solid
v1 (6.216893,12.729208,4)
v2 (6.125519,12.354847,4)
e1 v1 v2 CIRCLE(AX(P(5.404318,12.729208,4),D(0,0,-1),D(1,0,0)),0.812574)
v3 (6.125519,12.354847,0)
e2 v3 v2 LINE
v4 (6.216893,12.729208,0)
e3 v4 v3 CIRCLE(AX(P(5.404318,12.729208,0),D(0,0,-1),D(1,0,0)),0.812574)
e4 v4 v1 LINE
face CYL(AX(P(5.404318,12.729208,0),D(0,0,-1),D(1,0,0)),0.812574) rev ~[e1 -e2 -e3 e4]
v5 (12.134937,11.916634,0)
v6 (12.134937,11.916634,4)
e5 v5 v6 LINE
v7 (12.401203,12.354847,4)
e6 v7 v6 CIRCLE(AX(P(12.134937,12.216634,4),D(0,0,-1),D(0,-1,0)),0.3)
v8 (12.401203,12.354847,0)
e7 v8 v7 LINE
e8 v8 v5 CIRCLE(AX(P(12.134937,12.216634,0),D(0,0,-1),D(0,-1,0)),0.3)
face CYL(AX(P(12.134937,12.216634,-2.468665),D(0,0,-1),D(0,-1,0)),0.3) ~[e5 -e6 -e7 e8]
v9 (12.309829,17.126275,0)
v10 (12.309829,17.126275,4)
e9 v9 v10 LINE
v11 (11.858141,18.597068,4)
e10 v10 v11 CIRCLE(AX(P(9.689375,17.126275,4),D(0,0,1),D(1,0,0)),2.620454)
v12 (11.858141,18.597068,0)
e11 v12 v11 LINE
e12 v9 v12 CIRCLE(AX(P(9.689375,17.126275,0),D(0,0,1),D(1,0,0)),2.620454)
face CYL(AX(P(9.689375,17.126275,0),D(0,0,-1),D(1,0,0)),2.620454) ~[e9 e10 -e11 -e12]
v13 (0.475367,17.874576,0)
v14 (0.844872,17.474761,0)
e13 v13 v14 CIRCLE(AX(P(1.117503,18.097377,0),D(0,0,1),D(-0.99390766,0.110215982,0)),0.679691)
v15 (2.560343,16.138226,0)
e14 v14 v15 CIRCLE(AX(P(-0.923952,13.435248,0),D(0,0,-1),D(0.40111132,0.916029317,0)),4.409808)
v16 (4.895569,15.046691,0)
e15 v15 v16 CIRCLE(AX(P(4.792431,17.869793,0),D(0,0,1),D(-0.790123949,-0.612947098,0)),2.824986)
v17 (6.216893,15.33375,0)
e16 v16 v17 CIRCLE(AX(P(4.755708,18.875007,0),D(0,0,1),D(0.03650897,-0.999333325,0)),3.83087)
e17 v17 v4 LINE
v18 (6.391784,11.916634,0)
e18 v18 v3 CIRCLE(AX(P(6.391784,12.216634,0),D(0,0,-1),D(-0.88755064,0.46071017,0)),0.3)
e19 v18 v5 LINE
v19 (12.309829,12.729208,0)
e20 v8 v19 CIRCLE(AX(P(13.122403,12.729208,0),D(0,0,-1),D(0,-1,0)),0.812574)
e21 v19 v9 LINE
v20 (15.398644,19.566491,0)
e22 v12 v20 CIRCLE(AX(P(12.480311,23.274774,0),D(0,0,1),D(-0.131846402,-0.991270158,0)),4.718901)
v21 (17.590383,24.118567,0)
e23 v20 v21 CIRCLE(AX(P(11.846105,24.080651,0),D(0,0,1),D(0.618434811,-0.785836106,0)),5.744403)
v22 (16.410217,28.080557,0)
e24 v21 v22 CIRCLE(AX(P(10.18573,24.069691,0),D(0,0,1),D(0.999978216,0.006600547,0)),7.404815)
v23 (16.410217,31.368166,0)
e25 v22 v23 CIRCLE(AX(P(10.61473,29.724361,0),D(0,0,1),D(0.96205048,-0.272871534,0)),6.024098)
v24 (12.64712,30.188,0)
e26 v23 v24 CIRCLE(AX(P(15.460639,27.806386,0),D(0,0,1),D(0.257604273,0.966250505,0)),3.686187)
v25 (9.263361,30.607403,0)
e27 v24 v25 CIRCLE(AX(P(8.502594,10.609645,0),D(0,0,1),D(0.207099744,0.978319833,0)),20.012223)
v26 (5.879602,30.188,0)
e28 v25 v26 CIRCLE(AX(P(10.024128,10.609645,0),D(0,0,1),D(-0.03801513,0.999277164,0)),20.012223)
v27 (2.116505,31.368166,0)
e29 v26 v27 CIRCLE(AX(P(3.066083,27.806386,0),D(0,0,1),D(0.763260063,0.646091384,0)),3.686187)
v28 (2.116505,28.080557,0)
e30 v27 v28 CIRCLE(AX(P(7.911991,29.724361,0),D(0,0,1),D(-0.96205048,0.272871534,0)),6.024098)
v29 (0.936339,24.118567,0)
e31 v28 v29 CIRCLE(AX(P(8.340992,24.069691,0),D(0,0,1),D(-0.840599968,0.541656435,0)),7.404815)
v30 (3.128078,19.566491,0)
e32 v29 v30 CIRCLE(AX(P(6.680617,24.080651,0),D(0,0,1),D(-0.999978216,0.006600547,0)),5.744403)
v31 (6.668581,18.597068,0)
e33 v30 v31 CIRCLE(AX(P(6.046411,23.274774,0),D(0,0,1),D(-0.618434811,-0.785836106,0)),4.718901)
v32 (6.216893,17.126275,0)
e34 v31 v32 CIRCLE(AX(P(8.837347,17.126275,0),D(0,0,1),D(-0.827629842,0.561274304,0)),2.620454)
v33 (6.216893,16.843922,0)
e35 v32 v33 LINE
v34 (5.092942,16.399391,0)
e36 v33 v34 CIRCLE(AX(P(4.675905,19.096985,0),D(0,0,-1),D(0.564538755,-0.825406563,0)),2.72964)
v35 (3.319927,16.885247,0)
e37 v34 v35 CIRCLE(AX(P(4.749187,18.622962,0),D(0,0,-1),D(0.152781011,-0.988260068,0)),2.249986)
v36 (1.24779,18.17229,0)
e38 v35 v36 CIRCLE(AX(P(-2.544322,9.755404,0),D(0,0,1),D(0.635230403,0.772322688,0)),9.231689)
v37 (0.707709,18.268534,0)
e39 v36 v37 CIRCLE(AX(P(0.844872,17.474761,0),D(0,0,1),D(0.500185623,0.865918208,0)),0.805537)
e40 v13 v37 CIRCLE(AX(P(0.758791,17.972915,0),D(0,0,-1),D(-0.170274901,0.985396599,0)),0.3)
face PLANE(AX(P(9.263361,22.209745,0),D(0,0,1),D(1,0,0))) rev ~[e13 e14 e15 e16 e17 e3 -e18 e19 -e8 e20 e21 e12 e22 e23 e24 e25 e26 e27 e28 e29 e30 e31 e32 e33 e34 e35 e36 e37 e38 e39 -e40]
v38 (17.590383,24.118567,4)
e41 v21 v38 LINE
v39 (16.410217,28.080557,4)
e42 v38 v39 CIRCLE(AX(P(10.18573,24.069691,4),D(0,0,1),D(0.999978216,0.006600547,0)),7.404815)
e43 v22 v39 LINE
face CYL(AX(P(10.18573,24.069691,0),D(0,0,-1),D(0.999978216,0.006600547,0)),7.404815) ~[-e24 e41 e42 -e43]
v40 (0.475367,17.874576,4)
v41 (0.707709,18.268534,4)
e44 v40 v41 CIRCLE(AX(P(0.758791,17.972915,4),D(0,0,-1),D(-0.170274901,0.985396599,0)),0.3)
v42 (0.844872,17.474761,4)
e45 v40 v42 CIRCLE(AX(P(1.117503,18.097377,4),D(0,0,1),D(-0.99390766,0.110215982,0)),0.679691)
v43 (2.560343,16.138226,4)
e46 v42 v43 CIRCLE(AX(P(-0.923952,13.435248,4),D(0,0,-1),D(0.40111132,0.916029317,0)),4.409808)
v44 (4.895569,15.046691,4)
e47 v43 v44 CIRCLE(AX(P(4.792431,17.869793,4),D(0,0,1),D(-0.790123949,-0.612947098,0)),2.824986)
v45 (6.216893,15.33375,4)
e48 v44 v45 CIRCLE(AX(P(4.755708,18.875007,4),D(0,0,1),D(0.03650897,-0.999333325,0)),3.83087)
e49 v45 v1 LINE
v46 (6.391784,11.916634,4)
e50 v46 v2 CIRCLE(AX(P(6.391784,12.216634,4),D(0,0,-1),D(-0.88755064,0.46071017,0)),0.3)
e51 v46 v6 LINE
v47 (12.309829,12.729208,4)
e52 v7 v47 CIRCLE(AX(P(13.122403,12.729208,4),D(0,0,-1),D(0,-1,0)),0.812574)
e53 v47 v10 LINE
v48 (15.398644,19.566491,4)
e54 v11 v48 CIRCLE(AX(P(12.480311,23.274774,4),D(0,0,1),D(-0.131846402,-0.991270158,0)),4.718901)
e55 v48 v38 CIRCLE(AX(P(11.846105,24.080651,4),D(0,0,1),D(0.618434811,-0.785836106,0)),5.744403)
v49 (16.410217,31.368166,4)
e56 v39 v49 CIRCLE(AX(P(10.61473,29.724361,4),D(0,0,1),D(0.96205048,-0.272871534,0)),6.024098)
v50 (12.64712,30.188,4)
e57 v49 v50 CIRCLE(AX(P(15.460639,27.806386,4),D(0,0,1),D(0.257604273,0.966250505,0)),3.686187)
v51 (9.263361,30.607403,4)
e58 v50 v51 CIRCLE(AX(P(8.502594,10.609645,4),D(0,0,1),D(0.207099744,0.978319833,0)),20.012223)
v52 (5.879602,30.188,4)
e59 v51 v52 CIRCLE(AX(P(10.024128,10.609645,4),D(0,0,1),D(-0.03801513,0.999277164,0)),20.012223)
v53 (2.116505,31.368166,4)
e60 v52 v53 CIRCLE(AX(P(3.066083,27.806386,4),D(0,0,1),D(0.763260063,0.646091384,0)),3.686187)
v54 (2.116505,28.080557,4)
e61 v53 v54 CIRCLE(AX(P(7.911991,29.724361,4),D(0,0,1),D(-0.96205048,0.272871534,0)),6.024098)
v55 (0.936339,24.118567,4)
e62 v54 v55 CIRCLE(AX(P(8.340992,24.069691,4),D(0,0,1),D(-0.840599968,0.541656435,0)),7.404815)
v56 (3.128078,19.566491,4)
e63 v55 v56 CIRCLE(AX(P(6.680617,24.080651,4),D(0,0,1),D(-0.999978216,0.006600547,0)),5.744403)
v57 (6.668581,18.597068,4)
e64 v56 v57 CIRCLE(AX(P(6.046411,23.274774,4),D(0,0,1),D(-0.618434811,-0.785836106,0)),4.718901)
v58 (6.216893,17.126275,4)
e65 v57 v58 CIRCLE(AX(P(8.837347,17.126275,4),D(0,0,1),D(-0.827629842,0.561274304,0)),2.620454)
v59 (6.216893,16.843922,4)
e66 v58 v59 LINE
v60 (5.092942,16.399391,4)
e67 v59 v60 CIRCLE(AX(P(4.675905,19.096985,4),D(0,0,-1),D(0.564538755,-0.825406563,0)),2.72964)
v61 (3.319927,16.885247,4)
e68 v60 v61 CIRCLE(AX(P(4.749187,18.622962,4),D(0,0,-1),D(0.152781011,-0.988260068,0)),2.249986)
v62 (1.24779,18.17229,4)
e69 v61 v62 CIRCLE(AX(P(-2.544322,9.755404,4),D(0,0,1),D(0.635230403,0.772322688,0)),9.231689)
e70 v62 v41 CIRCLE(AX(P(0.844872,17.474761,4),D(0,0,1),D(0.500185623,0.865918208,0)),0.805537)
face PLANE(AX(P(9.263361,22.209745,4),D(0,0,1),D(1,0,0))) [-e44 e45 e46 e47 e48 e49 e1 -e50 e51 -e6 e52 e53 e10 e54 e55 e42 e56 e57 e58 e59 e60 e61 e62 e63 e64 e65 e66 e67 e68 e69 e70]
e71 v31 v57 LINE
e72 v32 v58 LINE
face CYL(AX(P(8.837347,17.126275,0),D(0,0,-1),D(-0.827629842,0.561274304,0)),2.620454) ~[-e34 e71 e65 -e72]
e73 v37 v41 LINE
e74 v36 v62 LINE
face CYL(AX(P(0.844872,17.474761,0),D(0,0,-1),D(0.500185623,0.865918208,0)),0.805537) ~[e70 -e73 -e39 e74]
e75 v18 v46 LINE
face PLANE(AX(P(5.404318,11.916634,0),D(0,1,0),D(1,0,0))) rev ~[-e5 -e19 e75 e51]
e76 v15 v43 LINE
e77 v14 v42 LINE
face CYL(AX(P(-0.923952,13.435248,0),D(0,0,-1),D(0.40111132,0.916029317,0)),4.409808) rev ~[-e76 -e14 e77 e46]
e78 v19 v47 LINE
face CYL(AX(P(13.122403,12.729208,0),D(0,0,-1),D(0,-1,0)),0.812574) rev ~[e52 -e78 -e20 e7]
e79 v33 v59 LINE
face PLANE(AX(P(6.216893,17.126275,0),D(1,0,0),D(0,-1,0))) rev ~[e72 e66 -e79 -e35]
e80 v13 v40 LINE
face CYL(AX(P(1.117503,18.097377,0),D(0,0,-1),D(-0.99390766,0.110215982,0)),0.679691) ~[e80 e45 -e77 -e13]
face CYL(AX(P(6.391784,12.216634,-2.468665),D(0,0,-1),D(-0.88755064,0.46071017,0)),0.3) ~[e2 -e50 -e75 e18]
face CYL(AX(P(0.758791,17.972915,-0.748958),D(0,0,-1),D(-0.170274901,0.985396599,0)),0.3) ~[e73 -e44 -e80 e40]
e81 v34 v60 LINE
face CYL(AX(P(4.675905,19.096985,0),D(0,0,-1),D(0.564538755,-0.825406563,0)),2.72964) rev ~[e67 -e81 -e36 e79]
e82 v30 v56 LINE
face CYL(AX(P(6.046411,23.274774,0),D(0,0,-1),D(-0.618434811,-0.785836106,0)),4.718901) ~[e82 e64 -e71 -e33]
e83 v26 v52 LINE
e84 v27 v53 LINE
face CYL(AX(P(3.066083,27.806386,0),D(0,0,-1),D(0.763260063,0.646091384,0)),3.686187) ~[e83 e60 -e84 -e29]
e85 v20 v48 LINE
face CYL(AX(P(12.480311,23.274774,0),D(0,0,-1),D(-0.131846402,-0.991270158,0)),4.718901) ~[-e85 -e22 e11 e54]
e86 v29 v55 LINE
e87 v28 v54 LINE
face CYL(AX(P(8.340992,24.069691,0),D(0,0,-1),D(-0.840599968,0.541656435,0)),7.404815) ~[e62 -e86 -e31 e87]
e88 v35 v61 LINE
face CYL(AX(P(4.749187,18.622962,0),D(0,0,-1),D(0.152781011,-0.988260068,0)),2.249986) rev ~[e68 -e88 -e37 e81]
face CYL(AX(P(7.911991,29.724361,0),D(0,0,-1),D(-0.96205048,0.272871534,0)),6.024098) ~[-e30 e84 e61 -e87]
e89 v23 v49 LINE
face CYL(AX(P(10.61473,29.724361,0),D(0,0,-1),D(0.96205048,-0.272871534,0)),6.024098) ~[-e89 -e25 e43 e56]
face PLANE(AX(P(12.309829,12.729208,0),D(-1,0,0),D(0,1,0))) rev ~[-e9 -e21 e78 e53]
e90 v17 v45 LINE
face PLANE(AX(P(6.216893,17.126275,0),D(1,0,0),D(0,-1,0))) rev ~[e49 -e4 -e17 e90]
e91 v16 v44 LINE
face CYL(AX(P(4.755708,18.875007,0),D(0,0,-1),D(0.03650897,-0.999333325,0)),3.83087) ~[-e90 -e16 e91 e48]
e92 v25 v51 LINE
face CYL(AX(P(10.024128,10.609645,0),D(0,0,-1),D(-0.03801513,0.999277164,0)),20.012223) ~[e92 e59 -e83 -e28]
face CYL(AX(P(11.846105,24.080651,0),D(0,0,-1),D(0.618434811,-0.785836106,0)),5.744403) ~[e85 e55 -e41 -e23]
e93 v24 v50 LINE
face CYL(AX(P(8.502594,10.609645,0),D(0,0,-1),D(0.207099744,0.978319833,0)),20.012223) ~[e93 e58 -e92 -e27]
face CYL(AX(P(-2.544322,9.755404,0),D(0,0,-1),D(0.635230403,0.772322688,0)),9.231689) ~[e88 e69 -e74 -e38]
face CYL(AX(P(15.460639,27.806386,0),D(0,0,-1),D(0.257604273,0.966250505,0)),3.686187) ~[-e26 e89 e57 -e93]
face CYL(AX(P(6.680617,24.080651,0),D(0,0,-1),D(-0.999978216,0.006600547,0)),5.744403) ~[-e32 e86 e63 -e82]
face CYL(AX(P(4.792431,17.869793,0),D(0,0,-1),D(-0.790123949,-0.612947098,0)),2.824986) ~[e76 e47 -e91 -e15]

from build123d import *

# Parameters (mm, degrees)
F1_DEPTH    = 4
F3_DEPTH    = 4
F4_T1_DEPTH = 8.9373301178
F4_T3_DEPTH = 5.4979166118


# Not quite as in the source:
# - a fillet or chamfer that OpenCascade refuses, or shapes differently, is made with other operations: its cross-section is extruded or revolved along the edge and cut away or added


with BuildPart() as f1:
    # F0 (on Top) → F1 (new body)
    with BuildSketch(Plane.XY):
        with BuildLine():
            Line((5.4043182717, 11.9166336954), (9.2633608729, 11.9166336954))
            Line((9.2633608729, 11.9166336954), (13.1224034741, 11.9166336954))
            ThreePointArc((13.1224034741, 11.9166336954), (12.5478266836, 12.1546311946), (12.3098291843, 12.7292079851))
            Line((12.3098291843, 12.7292079851), (12.3098291843, 17.1262745588))
            ThreePointArc((12.3098291843, 17.1262745588), (12.1943632439, 17.8955690891), (11.8581410497, 18.5970682651))
            ThreePointArc((11.8581410497, 18.5970682651), (13.7265197912, 18.7234015951), (15.3986439109, 19.5664912462))
            ThreePointArc((15.3986439109, 19.5664912462), (17.0218223076, 21.5886397467), (17.5903830677, 24.1185668856))
            ThreePointArc((17.5903830677, 24.1185668856), (17.2823984437, 26.1835910199), (16.4102166891, 28.0805565417))
            ThreePointArc((16.4102166891, 28.0805565417), (16.638828313, 29.724361375), (16.4102166891, 31.3681662083))
            ThreePointArc((16.4102166891, 31.3681662083), (14.3575671426, 31.3236587754), (12.6471198819, 30.1879998296))
            ThreePointArc((12.6471198819, 30.1879998296), (10.9641887914, 30.4698973914), (9.2633608729, 30.6074026007))
            ThreePointArc((9.2633608729, 30.6074026007), (7.5625329544, 30.4698973914), (5.8796018638, 30.1879998296))
            ThreePointArc((5.8796018638, 30.1879998296), (4.1691546032, 31.3236587754), (2.1165050566, 31.3681662083))
            ThreePointArc((2.1165050566, 31.3681662083), (1.8878934327, 29.724361375), (2.1165050566, 28.0805565417))
            ThreePointArc((2.1165050566, 28.0805565417), (1.244323302, 26.1835910199), (0.936338678, 24.1185668856))
            ThreePointArc((0.936338678, 24.1185668856), (1.5048994381, 21.5886397467), (3.1280778348, 19.5664912462))
            ThreePointArc((3.1280778348, 19.5664912462), (4.8002019546, 18.7234015951), (6.668580696, 18.5970682651))
            ThreePointArc((6.668580696, 18.5970682651), (6.3323585018, 17.8955690891), (6.2168925614, 17.1262745588))
            Line((6.2168925614, 17.1262745588), (6.2168925614, 12.7292079851))
            ThreePointArc((6.2168925614, 12.7292079851), (5.9788950622, 12.1546311946), (5.4043182717, 11.9166336954))
        make_face()
    extrude(amount=F1_DEPTH)

    # F2 (on Top) → F3 (join, through all)
    with BuildSketch(Plane.XY):
        with BuildLine():
            ThreePointArc((6.2168925614, 16.8439224371), (5.6798309181, 16.5586654348), (5.0929421559, 16.3993909955))
            ThreePointArc((5.0929421559, 16.3993909955), (4.1545493311, 16.4529754412), (3.3199274912, 16.8852470815))
            ThreePointArc((3.3199274912, 16.8852470815), (2.3265556072, 17.5975106191), (1.2477898737, 18.1722901762))
            ThreePointArc((1.2477898737, 18.1722901762), (0.8448717213, 18.2802980548), (0.441953569, 18.1722901762))
            ThreePointArc((0.441953569, 18.1722901762), (0.5289468082, 17.7574058892), (0.8448717213, 17.4747608034))
            ThreePointArc((0.8448717213, 17.4747608034), (1.7862867621, 16.9138981945), (2.5603426512, 16.1382264689))
            ThreePointArc((2.5603426512, 16.1382264689), (3.5961993789, 15.3105799436), (4.8955686661, 15.0466909773))
            ThreePointArc((4.8955686661, 15.0466909773), (5.5689958467, 15.1314623043), (6.2168925614, 15.3337497048))
            Line((6.2168925614, 15.3337497048), (6.2168925614, 16.8439224371))
        make_face()
    extrude(amount=F3_DEPTH)

    # F4: fillet of radius 0.3 on 3 edges, made by hand

    # F4_s2 → F4_t1 (cut)
    with BuildSketch(Plane.XY.offset(-2.4686650589)):
        with BuildLine():
            ThreePointArc((12.1349374505, 11.9166336954), (12.3913198946, 12.0608516606), (12.4012026427, 12.3548467462))
            ThreePointArc((12.4012026427, 12.3548467462), (12.7004552198, 12.0347753771), (13.1224034741, 11.9166336954))
            Line((13.1224034741, 11.9166336954), (12.1349374505, 11.9166336954))
        make_face()
        with BuildLine():
            ThreePointArc((6.1255191031, 12.3548467462), (6.1354018511, 12.0608516606), (6.3917842952, 11.9166336954))
            Line((6.3917842952, 11.9166336954), (5.4043182717, 11.9166336954))
            ThreePointArc((5.4043182717, 11.9166336954), (5.8262665259, 12.0347753771), (6.1255191031, 12.3548467462))
        make_face()
    extrude(amount=F4_T1_DEPTH, mode=Mode.SUBTRACT)

    # F4_s4 → F4_t3 (cut)
    with BuildSketch(Plane.XY.offset(-0.7489583059)):
        with BuildLine():
            ThreePointArc((0.7077089455, 18.2685344716), (0.5003837706, 18.1253146023), (0.4753670818, 17.8745760445))
            ThreePointArc((0.4753670818, 17.8745760445), (0.4420534576, 18.0215692627), (0.441953569, 18.1722901762))
            ThreePointArc((0.441953569, 18.1722901762), (0.5705770014, 18.2321594237), (0.7077089455, 18.2685344716))
        make_face()
    extrude(amount=F4_T3_DEPTH, mode=Mode.SUBTRACT)


solid = f1.part
